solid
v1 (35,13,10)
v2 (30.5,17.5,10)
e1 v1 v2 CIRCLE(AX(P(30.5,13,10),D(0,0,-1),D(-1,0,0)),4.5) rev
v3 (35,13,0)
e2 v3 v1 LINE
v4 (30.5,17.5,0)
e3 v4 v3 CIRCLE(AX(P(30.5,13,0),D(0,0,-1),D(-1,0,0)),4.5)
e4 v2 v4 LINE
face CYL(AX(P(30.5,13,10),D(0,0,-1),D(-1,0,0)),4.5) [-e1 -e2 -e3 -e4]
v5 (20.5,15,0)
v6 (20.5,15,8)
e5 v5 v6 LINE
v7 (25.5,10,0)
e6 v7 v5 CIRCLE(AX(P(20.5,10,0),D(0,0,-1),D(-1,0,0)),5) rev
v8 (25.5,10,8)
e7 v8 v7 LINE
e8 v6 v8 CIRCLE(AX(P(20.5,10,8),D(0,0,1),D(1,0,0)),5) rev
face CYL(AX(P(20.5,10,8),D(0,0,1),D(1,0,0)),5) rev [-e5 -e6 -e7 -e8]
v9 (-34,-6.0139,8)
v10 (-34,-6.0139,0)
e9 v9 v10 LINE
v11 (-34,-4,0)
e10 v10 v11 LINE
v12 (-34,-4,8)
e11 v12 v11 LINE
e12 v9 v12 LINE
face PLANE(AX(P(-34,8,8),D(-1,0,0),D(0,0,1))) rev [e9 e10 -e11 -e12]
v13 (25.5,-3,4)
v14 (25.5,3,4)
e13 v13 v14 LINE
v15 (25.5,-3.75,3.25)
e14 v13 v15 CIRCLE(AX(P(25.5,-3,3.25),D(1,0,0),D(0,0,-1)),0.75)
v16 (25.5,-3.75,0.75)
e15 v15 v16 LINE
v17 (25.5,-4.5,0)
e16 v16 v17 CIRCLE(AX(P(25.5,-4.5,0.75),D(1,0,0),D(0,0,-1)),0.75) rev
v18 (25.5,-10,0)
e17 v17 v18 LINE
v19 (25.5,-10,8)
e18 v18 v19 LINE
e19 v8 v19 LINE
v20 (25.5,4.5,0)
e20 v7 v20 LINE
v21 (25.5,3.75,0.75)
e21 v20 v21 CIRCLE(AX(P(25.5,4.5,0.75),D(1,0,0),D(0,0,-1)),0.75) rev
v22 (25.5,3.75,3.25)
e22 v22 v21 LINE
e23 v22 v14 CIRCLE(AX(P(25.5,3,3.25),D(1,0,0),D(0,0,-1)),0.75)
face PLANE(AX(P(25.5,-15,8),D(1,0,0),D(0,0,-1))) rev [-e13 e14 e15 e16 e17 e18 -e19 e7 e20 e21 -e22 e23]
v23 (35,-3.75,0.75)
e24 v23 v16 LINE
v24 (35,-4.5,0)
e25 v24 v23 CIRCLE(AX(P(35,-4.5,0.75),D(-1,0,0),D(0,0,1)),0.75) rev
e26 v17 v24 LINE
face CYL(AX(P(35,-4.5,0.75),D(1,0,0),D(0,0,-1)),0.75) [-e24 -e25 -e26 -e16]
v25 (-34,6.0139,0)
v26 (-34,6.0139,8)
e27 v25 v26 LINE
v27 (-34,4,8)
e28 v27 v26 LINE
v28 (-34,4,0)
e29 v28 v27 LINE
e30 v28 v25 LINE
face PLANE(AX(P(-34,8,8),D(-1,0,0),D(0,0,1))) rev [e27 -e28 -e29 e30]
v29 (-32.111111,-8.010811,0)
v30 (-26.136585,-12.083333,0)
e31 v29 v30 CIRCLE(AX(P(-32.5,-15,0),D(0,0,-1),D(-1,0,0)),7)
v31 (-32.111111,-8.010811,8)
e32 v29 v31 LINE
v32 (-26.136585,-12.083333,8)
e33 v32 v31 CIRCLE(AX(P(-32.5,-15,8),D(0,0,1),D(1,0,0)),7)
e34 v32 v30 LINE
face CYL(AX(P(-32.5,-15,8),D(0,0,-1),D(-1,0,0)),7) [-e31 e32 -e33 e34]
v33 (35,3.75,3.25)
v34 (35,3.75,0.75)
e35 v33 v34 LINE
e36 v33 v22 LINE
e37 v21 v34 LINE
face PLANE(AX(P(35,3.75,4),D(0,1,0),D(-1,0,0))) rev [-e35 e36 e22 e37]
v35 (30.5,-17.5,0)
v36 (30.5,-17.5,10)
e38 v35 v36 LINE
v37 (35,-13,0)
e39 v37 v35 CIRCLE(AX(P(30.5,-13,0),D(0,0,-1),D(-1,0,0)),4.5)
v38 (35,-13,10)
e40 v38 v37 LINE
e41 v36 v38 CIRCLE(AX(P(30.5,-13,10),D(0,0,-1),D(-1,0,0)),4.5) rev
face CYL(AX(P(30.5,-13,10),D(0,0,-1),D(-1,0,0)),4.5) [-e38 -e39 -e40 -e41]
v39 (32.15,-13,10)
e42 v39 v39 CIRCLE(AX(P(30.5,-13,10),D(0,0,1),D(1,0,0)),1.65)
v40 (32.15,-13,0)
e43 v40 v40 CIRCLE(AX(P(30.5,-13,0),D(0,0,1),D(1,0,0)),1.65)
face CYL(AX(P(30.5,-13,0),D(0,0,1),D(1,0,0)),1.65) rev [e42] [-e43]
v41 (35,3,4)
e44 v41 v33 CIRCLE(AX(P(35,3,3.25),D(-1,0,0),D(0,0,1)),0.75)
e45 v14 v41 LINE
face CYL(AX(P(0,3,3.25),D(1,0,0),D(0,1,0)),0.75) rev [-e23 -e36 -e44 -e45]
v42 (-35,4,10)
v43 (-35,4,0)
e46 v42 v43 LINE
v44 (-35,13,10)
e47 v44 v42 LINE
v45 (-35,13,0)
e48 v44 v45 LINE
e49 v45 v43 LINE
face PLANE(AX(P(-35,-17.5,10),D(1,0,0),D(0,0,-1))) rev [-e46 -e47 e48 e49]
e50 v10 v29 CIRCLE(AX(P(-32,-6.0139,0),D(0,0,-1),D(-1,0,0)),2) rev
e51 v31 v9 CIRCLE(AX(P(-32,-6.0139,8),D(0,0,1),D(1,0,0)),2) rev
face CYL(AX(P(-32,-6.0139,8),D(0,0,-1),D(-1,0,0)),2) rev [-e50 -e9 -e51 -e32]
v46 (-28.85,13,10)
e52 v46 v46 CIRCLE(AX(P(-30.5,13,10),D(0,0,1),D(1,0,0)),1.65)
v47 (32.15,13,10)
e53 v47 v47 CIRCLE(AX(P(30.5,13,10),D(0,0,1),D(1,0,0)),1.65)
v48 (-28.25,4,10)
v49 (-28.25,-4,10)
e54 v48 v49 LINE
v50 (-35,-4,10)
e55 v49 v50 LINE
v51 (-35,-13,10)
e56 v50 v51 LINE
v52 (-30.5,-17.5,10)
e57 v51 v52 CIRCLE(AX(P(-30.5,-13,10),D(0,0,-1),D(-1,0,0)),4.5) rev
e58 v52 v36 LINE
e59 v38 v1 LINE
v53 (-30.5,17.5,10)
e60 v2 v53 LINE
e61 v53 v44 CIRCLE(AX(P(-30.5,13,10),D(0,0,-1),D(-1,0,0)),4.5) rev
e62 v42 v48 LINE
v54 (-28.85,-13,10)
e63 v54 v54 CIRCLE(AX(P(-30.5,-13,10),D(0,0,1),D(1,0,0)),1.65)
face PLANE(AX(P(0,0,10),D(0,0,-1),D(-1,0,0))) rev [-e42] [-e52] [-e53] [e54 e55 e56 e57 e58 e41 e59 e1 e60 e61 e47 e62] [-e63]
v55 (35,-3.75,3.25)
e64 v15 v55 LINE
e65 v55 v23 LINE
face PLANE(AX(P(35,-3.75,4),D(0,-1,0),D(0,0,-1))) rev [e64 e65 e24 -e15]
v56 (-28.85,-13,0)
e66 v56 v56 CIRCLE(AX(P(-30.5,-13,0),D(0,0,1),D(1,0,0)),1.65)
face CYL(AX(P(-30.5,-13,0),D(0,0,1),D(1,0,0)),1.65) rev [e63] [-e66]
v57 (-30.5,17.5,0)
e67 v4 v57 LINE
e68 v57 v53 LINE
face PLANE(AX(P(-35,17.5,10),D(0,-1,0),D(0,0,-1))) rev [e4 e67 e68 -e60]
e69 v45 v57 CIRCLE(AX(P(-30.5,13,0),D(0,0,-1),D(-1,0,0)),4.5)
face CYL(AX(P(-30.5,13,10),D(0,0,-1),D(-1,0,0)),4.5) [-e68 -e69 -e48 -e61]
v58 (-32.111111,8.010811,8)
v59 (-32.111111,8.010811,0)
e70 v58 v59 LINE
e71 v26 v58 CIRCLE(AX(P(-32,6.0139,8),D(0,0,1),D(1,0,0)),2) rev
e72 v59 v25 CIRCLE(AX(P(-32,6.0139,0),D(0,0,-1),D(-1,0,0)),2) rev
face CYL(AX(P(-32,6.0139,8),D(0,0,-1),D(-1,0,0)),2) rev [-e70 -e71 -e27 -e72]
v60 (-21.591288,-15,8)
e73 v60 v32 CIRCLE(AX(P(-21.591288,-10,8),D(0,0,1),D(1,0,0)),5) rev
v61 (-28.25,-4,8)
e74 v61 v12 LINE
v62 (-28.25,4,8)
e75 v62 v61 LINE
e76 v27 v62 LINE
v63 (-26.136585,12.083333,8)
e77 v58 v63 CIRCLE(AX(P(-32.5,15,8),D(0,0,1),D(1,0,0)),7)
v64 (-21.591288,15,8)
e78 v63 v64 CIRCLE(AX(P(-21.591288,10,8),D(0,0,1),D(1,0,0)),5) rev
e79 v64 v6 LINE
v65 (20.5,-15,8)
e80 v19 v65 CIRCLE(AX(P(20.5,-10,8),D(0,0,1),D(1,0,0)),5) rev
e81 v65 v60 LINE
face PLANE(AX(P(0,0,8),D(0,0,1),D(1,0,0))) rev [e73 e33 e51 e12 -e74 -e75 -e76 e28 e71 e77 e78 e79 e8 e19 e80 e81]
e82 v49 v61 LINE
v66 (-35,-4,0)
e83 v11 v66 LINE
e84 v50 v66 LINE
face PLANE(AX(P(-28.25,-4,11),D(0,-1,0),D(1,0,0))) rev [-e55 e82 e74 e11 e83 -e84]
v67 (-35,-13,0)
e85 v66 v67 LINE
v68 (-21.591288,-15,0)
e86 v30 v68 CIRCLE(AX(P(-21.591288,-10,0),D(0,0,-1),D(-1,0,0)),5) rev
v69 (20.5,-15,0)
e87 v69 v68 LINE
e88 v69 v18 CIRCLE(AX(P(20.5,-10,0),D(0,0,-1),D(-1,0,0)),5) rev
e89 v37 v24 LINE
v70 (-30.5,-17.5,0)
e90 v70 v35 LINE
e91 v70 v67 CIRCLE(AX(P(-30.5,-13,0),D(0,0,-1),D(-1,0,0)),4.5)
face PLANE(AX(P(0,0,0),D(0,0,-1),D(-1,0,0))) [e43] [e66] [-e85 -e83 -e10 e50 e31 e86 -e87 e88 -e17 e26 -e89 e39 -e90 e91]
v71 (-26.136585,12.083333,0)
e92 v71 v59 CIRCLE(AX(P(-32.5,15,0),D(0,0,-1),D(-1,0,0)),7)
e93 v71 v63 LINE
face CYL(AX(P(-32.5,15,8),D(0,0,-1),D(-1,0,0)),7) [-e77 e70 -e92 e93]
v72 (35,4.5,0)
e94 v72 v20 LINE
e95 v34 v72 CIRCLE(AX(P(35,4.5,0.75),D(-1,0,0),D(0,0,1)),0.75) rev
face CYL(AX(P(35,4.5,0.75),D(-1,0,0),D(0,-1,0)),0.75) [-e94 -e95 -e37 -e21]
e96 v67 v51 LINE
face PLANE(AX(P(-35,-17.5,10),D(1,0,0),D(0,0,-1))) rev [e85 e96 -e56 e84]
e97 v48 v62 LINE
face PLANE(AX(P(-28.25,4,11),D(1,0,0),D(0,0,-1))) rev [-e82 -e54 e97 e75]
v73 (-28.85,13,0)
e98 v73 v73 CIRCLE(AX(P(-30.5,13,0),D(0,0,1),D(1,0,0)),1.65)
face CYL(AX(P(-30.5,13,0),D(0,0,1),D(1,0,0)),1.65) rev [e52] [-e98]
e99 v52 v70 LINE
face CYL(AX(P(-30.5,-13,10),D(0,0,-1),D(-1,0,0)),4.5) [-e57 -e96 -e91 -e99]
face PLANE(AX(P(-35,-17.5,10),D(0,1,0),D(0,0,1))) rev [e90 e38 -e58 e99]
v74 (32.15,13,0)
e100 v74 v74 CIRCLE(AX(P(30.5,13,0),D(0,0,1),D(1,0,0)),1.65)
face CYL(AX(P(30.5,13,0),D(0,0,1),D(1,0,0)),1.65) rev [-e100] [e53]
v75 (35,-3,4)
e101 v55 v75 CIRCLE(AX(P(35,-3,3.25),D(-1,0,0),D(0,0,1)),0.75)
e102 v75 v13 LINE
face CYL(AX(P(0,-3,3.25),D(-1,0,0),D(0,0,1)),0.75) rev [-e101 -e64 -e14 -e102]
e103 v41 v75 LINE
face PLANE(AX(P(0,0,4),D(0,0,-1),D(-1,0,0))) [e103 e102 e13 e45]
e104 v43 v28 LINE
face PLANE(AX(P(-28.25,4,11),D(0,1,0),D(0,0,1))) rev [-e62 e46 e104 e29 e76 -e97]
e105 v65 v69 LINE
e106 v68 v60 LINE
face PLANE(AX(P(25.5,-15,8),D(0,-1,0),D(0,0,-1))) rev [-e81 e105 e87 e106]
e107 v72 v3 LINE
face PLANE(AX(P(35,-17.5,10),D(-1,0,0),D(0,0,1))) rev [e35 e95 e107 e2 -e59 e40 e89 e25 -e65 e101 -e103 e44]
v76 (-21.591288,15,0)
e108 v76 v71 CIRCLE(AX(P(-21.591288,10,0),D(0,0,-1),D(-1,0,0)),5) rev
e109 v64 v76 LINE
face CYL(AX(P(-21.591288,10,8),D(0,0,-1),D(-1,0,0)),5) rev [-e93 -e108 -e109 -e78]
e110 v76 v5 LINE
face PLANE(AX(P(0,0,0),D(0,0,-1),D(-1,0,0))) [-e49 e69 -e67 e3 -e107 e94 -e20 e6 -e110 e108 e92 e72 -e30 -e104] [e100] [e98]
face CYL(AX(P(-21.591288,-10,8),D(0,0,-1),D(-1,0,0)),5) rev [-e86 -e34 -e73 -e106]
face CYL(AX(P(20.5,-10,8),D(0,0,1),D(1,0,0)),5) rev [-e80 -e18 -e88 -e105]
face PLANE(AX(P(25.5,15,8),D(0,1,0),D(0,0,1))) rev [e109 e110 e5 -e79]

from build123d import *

# Parameters (mm, degrees)
SKETCH1_W           = 70
SKETCH1_H           = 35
BOSS_EXTRUDE1_DEPTH = 10
FILLET1_R           = 4.5
SKETCH2_R           = 1.65
CUT_EXTRUDE1_DEPTH  = 10
SKETCH3_W           = 51
SKETCH3_H           = 30
CUT_EXTRUDE2_DEPTH  = 8
SKETCH4_W           = 6.75
SKETCH4_H           = 8
CUT_EXTRUDE3_DEPTH  = 11
SKETCH5_W           = 8.5
SKETCH5_H           = 16
CUT_EXTRUDE5_DEPTH  = 8
SKETCH6_W           = 9.5
SKETCH6_H           = 7.5
CUT_EXTRUDE6_DEPTH  = 4
FILLET2_R           = 0.75
FILLET3_R           = 5
FILLET4_R           = 7
FILLET5_R           = 5
FILLET6_R           = 2


with BuildPart() as part:
    # Sketch1 → Boss-Extrude1 (new body)
    with BuildSketch(Plane.XY):
        Rectangle(SKETCH1_W, SKETCH1_H)
    extrude(amount=BOSS_EXTRUDE1_DEPTH)

    # Fillet1
    fillet1_edges = [part.edges().sort_by_distance(p)[0] for p in [
        (35, -17.5, 5),
        (-35, -17.5, 5),
        (-35, 17.5, 5),
        (35, 17.5, 5),
    ]]
    fillet(fillet1_edges, radius=FILLET1_R)

    # Sketch2 → Cut-Extrude1 (cut)
    with BuildSketch(Plane.XY.offset(10)):
        with Locations((-30.5, 13)):
            Circle(SKETCH2_R)
        with Locations((30.5, 13)):
            Circle(SKETCH2_R)
        with Locations((30.5, -13)):
            Circle(SKETCH2_R)
        with Locations((-30.5, -13)):
            Circle(SKETCH2_R)
    extrude(amount=-CUT_EXTRUDE1_DEPTH, mode=Mode.SUBTRACT)

    # Sketch3 → Cut-Extrude2 (cut)
    with BuildSketch(Plane(origin=(0, 0, 0), x_dir=(-1, 0, 0), z_dir=(0, 0, -1))):
        Rectangle(SKETCH3_W, SKETCH3_H)
    extrude(amount=-CUT_EXTRUDE2_DEPTH, mode=Mode.SUBTRACT)

    # Sketch4 → Cut-Extrude3 (cut)
    with BuildSketch(Plane(origin=(0, 0, 0), x_dir=(-1, 0, 0), z_dir=(0, 0, -1))):
        with Locations((31.625, 0)):
            Rectangle(SKETCH4_W, SKETCH4_H)
    extrude(amount=-CUT_EXTRUDE3_DEPTH, mode=Mode.SUBTRACT)

    # Sketch5 → Cut-Extrude5 (cut)
    with BuildSketch(Plane(origin=(0, 0, 0), x_dir=(-1, 0, 0), z_dir=(0, 0, -1))):
        with Locations((29.75, 0)):
            Rectangle(SKETCH5_W, SKETCH5_H)
    extrude(amount=-CUT_EXTRUDE5_DEPTH, mode=Mode.SUBTRACT)

    # Sketch6 → Cut-Extrude6 (cut)
    with BuildSketch(Plane(origin=(0, 0, 0), x_dir=(-1, 0, 0), z_dir=(0, 0, -1))):
        with Locations((-30.25, 0)):
            Rectangle(SKETCH6_W, SKETCH6_H)
    extrude(amount=-CUT_EXTRUDE6_DEPTH, mode=Mode.SUBTRACT)

    # Fillet2
    fillet2_edges = [part.edges().sort_by_distance(p)[0] for p in [
        (30.25, 3.75, 4),
        (30.25, -3.75, 4),
        (30.25, -3.75, 0),
        (30.25, 3.75, 0),
    ]]
    fillet(fillet2_edges, radius=FILLET2_R)

    # Fillet3
    fillet3_edges = [part.edges().sort_by_distance(p)[0] for p in [
        (25.5, -15, 4),
        (25.5, 15, 4),
    ]]
    fillet(fillet3_edges, radius=FILLET3_R)

    # Fillet4
    fillet4_edges = [part.edges().sort_by_distance(p)[0] for p in [
        (-25.5, -8, 4),
        (-25.5, 8, 4),
    ]]
    fillet(fillet4_edges, radius=FILLET4_R - 0.0001)  # a hair under: the kernel refuses the full size

    # Fillet5
    fillet5_edges = [part.edges().sort_by_distance(p)[0] for p in [
        (-25.5, 15, 4),
        (-25.5, -15, 4),
    ]]
    fillet(fillet5_edges, radius=FILLET5_R)

    # Fillet6
    fillet6_edges = [part.edges().sort_by_distance(p)[0] for p in [
        (-34, -8, 4),
        (-34, 8, 4),
    ]]
    fillet(fillet6_edges, radius=FILLET6_R)


solid = part.part
